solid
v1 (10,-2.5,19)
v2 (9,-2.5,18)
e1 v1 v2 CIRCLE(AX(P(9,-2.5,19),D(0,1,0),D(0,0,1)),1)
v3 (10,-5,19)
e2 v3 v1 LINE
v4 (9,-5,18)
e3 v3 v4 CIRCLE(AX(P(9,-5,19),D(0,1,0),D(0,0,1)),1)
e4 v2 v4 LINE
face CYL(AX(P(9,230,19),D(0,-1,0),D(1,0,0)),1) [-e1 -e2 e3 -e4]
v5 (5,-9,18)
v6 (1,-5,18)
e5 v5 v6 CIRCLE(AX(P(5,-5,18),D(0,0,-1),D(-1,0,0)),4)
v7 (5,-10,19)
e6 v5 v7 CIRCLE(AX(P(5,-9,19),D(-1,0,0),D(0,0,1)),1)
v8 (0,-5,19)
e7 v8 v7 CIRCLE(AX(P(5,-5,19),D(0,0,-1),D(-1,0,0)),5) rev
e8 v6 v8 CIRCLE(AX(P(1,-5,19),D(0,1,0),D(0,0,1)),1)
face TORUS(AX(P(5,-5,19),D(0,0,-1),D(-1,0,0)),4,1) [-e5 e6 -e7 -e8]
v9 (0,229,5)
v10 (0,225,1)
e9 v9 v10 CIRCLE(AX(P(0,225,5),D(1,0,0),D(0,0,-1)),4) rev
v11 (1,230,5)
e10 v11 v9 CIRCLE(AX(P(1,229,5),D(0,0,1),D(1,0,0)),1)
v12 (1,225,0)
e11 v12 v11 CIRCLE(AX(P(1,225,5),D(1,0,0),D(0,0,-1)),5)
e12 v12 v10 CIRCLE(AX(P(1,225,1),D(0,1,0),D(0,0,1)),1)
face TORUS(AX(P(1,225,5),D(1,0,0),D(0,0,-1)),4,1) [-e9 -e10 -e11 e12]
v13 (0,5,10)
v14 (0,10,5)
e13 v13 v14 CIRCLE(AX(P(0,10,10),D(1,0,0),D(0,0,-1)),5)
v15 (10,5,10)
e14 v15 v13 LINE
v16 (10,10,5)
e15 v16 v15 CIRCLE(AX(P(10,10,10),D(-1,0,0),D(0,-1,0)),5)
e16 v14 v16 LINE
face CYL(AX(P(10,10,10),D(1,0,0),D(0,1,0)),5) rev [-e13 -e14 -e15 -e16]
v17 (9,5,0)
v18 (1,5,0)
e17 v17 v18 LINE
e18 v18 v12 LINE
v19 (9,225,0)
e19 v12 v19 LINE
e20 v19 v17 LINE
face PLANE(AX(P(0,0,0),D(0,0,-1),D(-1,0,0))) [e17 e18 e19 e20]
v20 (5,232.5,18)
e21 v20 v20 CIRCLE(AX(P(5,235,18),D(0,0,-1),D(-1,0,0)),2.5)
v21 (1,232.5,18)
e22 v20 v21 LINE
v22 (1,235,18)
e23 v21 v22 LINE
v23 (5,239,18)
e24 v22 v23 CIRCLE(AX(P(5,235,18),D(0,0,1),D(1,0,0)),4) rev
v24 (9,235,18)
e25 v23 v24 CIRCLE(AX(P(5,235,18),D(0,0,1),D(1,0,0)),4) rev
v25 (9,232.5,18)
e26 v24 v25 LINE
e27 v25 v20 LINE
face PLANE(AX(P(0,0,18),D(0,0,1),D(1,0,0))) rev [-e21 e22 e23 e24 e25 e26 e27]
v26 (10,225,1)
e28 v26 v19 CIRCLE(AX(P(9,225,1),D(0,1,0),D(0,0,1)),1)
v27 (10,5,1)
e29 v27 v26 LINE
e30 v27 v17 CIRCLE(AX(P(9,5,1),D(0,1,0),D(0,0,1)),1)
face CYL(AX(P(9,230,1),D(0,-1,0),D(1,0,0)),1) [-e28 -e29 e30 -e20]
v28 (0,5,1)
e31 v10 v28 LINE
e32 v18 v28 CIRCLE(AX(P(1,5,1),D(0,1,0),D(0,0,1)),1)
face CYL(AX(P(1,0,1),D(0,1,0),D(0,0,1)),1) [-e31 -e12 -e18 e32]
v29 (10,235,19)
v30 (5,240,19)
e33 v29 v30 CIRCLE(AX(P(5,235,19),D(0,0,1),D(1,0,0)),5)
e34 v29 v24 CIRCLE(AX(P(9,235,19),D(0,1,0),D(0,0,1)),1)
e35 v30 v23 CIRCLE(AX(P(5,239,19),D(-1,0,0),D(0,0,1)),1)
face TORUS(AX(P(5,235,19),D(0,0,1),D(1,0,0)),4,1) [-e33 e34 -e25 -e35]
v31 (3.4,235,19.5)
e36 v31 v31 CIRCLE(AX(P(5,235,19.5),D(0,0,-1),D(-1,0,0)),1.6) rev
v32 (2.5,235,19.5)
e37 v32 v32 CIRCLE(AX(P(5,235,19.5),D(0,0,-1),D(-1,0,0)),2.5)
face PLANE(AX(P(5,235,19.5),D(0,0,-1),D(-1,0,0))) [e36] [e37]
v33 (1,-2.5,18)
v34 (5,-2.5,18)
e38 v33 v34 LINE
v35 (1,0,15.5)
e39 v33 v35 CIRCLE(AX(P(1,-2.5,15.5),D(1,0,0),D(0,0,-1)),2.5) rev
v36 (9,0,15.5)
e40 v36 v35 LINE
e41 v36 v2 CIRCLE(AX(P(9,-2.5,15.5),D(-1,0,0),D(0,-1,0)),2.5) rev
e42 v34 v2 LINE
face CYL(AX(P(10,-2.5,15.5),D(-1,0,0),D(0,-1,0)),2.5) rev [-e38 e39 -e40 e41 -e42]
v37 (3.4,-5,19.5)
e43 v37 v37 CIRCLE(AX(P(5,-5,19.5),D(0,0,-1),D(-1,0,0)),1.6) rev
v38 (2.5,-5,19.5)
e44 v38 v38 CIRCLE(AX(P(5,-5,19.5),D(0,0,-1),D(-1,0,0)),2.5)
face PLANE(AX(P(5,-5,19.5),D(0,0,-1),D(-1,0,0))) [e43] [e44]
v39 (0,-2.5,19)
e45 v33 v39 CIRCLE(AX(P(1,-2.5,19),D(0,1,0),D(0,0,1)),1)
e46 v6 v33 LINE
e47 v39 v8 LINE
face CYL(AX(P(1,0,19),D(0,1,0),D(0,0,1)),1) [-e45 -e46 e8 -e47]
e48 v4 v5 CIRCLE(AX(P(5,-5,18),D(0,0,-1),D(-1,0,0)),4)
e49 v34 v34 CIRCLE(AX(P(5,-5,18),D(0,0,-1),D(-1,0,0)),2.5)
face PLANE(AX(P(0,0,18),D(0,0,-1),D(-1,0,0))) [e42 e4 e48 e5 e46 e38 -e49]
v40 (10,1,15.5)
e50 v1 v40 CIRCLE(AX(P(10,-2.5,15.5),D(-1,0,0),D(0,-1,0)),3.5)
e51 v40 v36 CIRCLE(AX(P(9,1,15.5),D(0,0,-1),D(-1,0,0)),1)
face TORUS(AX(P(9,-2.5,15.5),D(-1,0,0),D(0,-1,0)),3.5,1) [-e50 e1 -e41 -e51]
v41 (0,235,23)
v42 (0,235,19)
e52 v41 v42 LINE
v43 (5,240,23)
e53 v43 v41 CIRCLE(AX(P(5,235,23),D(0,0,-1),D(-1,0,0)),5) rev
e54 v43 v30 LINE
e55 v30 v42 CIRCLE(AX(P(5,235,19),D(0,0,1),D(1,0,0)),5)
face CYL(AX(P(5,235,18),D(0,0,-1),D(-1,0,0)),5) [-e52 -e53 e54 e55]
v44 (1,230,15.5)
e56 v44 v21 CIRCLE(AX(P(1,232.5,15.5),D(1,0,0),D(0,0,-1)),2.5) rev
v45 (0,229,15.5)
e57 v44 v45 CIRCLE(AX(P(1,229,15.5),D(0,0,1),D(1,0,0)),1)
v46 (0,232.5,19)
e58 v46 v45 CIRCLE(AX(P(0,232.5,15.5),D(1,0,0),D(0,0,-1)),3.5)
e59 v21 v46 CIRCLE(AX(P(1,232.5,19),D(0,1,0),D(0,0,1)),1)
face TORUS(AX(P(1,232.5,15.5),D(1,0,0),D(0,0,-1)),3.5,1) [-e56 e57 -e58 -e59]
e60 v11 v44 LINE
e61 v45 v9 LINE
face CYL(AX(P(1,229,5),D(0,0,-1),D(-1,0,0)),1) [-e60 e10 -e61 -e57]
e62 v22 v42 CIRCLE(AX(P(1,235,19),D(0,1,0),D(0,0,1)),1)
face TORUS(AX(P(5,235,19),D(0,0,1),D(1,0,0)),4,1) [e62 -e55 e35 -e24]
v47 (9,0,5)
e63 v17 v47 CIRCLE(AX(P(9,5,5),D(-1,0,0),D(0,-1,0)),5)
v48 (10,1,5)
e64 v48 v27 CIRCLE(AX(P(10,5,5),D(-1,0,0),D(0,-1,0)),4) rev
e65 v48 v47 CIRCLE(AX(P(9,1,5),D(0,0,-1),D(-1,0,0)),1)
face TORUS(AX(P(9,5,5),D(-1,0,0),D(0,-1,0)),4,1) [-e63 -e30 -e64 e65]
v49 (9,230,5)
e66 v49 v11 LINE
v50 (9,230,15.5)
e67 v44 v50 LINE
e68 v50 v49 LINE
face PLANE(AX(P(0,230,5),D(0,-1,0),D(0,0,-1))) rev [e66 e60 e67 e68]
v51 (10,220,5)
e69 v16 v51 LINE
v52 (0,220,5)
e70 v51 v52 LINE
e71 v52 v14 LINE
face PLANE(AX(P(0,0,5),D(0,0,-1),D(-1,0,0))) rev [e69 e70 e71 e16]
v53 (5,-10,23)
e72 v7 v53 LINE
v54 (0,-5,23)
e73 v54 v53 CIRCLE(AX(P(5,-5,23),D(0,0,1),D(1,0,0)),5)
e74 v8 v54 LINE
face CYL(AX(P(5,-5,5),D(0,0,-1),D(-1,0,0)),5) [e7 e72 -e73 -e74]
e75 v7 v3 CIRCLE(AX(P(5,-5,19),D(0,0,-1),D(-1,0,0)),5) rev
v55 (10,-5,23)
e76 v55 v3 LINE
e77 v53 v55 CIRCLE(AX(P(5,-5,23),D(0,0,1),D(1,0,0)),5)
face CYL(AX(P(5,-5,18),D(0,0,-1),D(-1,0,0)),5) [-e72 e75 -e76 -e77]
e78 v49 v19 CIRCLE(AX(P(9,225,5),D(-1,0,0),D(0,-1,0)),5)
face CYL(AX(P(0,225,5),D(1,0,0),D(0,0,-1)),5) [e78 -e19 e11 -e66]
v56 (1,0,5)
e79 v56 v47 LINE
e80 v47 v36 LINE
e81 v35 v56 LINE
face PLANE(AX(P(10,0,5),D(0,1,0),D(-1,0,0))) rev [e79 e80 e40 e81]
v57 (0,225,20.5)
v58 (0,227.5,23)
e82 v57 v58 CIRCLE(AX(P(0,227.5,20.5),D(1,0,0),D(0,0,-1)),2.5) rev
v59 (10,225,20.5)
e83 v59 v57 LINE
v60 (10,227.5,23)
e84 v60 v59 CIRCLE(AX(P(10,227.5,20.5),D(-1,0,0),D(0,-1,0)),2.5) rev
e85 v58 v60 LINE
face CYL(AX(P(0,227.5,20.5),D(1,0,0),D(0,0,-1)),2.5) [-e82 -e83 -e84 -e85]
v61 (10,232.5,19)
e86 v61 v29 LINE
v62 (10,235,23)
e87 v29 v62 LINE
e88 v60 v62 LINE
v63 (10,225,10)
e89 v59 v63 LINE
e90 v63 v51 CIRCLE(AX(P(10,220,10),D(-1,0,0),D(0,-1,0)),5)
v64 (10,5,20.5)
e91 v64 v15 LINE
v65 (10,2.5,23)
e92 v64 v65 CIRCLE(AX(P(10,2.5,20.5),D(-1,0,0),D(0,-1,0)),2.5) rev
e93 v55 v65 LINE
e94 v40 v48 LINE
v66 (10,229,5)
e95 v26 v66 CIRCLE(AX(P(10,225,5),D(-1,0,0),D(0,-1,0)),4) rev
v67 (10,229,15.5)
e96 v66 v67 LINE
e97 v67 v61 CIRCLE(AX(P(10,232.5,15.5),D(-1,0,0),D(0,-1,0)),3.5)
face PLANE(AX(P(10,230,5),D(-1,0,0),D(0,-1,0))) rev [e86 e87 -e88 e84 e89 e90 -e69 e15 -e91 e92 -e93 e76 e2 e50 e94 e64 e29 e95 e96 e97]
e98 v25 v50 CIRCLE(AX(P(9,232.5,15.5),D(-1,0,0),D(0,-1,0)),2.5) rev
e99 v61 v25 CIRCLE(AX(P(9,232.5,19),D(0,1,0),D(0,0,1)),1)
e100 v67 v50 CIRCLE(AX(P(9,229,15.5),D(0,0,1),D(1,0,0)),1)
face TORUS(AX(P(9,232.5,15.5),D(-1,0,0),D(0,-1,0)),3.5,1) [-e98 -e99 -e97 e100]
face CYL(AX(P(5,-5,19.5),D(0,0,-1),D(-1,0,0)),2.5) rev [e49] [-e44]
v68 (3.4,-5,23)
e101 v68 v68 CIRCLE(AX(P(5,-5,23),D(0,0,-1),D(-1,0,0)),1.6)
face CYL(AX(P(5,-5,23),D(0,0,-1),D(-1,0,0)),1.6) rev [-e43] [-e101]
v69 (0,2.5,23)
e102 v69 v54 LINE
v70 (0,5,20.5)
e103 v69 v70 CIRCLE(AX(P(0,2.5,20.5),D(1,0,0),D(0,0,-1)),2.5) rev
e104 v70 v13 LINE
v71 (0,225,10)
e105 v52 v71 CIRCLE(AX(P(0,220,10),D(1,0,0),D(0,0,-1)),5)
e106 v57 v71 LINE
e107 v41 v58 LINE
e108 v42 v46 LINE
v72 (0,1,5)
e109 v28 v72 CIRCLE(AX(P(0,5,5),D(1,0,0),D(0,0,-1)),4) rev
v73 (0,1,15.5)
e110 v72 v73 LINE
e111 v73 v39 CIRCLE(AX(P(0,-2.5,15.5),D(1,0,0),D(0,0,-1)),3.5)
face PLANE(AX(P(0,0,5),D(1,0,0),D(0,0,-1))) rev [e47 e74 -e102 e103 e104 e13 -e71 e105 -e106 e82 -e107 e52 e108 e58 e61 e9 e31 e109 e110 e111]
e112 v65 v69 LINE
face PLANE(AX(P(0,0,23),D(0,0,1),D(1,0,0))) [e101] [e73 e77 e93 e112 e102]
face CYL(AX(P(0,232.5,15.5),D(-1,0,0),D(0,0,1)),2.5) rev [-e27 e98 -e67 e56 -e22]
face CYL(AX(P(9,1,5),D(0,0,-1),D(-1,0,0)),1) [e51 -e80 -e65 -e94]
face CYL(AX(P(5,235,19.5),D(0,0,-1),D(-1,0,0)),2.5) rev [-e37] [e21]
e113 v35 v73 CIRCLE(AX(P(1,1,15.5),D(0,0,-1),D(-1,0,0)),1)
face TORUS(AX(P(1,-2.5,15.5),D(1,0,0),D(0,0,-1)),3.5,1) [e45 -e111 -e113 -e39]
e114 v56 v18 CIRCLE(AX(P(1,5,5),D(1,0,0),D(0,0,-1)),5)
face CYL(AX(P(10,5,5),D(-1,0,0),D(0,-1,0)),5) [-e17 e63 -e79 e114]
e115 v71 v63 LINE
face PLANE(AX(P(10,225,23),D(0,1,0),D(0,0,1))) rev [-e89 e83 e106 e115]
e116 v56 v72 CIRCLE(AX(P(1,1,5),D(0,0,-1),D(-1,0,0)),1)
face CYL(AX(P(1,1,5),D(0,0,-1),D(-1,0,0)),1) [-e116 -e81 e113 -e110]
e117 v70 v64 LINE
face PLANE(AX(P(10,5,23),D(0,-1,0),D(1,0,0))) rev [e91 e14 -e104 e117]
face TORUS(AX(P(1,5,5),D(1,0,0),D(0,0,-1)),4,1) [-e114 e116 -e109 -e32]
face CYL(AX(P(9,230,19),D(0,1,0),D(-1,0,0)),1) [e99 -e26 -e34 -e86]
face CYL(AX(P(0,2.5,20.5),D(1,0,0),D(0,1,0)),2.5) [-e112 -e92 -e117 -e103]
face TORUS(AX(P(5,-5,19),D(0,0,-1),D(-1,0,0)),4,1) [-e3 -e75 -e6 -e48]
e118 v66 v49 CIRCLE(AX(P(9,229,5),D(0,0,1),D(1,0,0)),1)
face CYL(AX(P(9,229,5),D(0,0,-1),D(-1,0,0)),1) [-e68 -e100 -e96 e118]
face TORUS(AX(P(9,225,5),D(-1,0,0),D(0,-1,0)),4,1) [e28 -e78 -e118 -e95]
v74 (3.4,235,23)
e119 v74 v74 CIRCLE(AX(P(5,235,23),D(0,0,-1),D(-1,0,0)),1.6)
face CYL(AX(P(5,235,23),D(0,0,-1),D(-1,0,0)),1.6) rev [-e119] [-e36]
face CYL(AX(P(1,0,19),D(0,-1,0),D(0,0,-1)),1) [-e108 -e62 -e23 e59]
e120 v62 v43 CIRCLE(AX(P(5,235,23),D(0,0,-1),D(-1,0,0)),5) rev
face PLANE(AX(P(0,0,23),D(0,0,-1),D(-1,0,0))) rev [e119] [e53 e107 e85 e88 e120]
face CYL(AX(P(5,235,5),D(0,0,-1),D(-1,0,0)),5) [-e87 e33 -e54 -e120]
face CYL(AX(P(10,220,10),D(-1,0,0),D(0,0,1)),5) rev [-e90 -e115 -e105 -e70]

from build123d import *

# Parameters (mm, degrees)
BOSS_EXTRUDE1_DEPTH = 5
BOSS_EXTRUDE2_DEPTH = 18
SKETCH3_W           = 9.999999999999972
SKETCH3_H           = 10
BOSS_EXTRUDE3_DEPTH = 5
SKETCH4_R           = 1.5999999999999999
SKETCH4_R_2         = 1.599999999999992
CUT_EXTRUDE1_DEPTH  = 241.88171371027735
SKETCH5_R           = 2.5000000000000004
SKETCH5_R_2         = 2.500000000000001
CUT_EXTRUDE2_DEPTH  = 1.5
FILLET1_R           = 5
FILLET2_R           = 2.5
FILLET3_R           = 1


with BuildPart() as part:
    # Sketch1 → Boss-Extrude1 (new body)
    with BuildSketch(Plane.XY):
        Polygon((0, 0), (0, 230), (9.999999999999972, 230), (10, -7.8e-16), align=None)
    extrude(amount=BOSS_EXTRUDE1_DEPTH)

    # Sketch2 → Boss-Extrude2 (add)
    with BuildSketch(Plane.XY.offset(5)):
        Polygon((0, 0), (10, -7.8e-16), (10, 4.999999999999999), (0, 5.000000000000004), align=None)
        Polygon((0, 230), (9.999999999999972, 230), (10, 225), (0, 225), align=None)
    extrude(amount=BOSS_EXTRUDE2_DEPTH)

    # Sketch3 → Boss-Extrude3 (add)
    with BuildSketch(Plane.XY.offset(23)):
        with Locations((4.999999999999986, 235.00000000000003)):
            Rectangle(SKETCH3_W, SKETCH3_H)
        Polygon((0, 0), (10, -7.8e-16), (10.000000000000002, -10), (0, -10.000000000000002), align=None)
    extrude(amount=-BOSS_EXTRUDE3_DEPTH)

    # Sketch4 → Cut-Extrude1 (cut, through all)
    with BuildSketch(Plane(origin=(0, 0, 18), x_dir=(-1, 0, 0), z_dir=(0, 0, -1))):
        with Locations((-5, -5.000000000000002)):
            Circle(SKETCH4_R)
        with Locations((-5, 235.00000000000003)):
            Circle(SKETCH4_R_2)
    extrude(amount=-CUT_EXTRUDE1_DEPTH, mode=Mode.SUBTRACT)

    # Sketch5 → Cut-Extrude2 (cut)
    with BuildSketch(Plane(origin=(0, 0, 18), x_dir=(-1, 0, 0), z_dir=(0, 0, -1))):
        with Locations((-5, -5.000000000000002)):
            Circle(SKETCH5_R)
        with Locations((-5, 235.00000000000003)):
            Circle(SKETCH5_R_2)
    extrude(amount=-CUT_EXTRUDE2_DEPTH, mode=Mode.SUBTRACT)

    # Fillet1
    fillet1_edges = [part.edges().sort_by_distance(p)[0] for p in [
        (0, -10.000000000000002, 20.5),
        (10.000000000000002, -10, 20.5),
        (0, 240.00000000000003, 20.5),
        (9.999999999999972, 240.00000000000003, 20.5),
        (5, 225, 5),
        (4.999999999999986, 230, 0),
        (5, 5.000000000000002, 5),
        (5, -3.9e-16, 0),
    ]]
    fillet(fillet1_edges, radius=FILLET1_R - 0.0001)  # a hair under: the kernel refuses the full size

    # Fillet2
    fillet2_edges = [part.edges().sort_by_distance(p)[0] for p in [
        (5, 5.000000000000002, 23),
        (5, 225, 23),
        (4.999999999999986, 230, 18),
        (5, -3.9e-16, 18),
    ]]
    fillet(fillet2_edges, radius=FILLET2_R)

    # Fillet3
    fillet3_edges = [part.edges().sort_by_distance(p)[0] for p in [
        (0, 115, 0),
        (0, 233.75005000000002, 18),
        (-2.7e-16, 1.4644368047453802, 1.4644368047453806),
        (0, 228.5355631952546, 1.4644368047453806),
        (10, -3.7500500000000008, 18),
        (8.53556319525462, -8.535563195254621, 18),
        (1.464436804745381, -8.53556319525462, 18),
        (9.999999999999986, 115, 0),
        (10, 1.4644368047453793, 1.4644368047453806),
        (9.999999999999972, 228.5355631952546, 1.4644368047453806),
        (8.53556319525459, 238.53556319525464, 18),
        (1.4644368047453793, 238.53556319525464, 18),
        (10, -7.8e-16, 10.249949999999998),
        (9.999999999999972, 230, 10.24995),
        (9.999999999999972, 233.75005000000002, 18),
        (0, -3.75005, 18),
        (0, 230, 10.24995),
        (0, 0, 10.249949999999998),
        (9.999999999999972, 230.73223304703362, 17.26776695296637),
        (0, 230.73223304703362, 17.26776695296637),
        (1.4e-16, -0.7322330470336309, 17.26776695296637),
        (10, -0.7322330470336316, 17.26776695296637),
    ]]
    fillet(fillet3_edges, radius=FILLET3_R)


solid = part.part
